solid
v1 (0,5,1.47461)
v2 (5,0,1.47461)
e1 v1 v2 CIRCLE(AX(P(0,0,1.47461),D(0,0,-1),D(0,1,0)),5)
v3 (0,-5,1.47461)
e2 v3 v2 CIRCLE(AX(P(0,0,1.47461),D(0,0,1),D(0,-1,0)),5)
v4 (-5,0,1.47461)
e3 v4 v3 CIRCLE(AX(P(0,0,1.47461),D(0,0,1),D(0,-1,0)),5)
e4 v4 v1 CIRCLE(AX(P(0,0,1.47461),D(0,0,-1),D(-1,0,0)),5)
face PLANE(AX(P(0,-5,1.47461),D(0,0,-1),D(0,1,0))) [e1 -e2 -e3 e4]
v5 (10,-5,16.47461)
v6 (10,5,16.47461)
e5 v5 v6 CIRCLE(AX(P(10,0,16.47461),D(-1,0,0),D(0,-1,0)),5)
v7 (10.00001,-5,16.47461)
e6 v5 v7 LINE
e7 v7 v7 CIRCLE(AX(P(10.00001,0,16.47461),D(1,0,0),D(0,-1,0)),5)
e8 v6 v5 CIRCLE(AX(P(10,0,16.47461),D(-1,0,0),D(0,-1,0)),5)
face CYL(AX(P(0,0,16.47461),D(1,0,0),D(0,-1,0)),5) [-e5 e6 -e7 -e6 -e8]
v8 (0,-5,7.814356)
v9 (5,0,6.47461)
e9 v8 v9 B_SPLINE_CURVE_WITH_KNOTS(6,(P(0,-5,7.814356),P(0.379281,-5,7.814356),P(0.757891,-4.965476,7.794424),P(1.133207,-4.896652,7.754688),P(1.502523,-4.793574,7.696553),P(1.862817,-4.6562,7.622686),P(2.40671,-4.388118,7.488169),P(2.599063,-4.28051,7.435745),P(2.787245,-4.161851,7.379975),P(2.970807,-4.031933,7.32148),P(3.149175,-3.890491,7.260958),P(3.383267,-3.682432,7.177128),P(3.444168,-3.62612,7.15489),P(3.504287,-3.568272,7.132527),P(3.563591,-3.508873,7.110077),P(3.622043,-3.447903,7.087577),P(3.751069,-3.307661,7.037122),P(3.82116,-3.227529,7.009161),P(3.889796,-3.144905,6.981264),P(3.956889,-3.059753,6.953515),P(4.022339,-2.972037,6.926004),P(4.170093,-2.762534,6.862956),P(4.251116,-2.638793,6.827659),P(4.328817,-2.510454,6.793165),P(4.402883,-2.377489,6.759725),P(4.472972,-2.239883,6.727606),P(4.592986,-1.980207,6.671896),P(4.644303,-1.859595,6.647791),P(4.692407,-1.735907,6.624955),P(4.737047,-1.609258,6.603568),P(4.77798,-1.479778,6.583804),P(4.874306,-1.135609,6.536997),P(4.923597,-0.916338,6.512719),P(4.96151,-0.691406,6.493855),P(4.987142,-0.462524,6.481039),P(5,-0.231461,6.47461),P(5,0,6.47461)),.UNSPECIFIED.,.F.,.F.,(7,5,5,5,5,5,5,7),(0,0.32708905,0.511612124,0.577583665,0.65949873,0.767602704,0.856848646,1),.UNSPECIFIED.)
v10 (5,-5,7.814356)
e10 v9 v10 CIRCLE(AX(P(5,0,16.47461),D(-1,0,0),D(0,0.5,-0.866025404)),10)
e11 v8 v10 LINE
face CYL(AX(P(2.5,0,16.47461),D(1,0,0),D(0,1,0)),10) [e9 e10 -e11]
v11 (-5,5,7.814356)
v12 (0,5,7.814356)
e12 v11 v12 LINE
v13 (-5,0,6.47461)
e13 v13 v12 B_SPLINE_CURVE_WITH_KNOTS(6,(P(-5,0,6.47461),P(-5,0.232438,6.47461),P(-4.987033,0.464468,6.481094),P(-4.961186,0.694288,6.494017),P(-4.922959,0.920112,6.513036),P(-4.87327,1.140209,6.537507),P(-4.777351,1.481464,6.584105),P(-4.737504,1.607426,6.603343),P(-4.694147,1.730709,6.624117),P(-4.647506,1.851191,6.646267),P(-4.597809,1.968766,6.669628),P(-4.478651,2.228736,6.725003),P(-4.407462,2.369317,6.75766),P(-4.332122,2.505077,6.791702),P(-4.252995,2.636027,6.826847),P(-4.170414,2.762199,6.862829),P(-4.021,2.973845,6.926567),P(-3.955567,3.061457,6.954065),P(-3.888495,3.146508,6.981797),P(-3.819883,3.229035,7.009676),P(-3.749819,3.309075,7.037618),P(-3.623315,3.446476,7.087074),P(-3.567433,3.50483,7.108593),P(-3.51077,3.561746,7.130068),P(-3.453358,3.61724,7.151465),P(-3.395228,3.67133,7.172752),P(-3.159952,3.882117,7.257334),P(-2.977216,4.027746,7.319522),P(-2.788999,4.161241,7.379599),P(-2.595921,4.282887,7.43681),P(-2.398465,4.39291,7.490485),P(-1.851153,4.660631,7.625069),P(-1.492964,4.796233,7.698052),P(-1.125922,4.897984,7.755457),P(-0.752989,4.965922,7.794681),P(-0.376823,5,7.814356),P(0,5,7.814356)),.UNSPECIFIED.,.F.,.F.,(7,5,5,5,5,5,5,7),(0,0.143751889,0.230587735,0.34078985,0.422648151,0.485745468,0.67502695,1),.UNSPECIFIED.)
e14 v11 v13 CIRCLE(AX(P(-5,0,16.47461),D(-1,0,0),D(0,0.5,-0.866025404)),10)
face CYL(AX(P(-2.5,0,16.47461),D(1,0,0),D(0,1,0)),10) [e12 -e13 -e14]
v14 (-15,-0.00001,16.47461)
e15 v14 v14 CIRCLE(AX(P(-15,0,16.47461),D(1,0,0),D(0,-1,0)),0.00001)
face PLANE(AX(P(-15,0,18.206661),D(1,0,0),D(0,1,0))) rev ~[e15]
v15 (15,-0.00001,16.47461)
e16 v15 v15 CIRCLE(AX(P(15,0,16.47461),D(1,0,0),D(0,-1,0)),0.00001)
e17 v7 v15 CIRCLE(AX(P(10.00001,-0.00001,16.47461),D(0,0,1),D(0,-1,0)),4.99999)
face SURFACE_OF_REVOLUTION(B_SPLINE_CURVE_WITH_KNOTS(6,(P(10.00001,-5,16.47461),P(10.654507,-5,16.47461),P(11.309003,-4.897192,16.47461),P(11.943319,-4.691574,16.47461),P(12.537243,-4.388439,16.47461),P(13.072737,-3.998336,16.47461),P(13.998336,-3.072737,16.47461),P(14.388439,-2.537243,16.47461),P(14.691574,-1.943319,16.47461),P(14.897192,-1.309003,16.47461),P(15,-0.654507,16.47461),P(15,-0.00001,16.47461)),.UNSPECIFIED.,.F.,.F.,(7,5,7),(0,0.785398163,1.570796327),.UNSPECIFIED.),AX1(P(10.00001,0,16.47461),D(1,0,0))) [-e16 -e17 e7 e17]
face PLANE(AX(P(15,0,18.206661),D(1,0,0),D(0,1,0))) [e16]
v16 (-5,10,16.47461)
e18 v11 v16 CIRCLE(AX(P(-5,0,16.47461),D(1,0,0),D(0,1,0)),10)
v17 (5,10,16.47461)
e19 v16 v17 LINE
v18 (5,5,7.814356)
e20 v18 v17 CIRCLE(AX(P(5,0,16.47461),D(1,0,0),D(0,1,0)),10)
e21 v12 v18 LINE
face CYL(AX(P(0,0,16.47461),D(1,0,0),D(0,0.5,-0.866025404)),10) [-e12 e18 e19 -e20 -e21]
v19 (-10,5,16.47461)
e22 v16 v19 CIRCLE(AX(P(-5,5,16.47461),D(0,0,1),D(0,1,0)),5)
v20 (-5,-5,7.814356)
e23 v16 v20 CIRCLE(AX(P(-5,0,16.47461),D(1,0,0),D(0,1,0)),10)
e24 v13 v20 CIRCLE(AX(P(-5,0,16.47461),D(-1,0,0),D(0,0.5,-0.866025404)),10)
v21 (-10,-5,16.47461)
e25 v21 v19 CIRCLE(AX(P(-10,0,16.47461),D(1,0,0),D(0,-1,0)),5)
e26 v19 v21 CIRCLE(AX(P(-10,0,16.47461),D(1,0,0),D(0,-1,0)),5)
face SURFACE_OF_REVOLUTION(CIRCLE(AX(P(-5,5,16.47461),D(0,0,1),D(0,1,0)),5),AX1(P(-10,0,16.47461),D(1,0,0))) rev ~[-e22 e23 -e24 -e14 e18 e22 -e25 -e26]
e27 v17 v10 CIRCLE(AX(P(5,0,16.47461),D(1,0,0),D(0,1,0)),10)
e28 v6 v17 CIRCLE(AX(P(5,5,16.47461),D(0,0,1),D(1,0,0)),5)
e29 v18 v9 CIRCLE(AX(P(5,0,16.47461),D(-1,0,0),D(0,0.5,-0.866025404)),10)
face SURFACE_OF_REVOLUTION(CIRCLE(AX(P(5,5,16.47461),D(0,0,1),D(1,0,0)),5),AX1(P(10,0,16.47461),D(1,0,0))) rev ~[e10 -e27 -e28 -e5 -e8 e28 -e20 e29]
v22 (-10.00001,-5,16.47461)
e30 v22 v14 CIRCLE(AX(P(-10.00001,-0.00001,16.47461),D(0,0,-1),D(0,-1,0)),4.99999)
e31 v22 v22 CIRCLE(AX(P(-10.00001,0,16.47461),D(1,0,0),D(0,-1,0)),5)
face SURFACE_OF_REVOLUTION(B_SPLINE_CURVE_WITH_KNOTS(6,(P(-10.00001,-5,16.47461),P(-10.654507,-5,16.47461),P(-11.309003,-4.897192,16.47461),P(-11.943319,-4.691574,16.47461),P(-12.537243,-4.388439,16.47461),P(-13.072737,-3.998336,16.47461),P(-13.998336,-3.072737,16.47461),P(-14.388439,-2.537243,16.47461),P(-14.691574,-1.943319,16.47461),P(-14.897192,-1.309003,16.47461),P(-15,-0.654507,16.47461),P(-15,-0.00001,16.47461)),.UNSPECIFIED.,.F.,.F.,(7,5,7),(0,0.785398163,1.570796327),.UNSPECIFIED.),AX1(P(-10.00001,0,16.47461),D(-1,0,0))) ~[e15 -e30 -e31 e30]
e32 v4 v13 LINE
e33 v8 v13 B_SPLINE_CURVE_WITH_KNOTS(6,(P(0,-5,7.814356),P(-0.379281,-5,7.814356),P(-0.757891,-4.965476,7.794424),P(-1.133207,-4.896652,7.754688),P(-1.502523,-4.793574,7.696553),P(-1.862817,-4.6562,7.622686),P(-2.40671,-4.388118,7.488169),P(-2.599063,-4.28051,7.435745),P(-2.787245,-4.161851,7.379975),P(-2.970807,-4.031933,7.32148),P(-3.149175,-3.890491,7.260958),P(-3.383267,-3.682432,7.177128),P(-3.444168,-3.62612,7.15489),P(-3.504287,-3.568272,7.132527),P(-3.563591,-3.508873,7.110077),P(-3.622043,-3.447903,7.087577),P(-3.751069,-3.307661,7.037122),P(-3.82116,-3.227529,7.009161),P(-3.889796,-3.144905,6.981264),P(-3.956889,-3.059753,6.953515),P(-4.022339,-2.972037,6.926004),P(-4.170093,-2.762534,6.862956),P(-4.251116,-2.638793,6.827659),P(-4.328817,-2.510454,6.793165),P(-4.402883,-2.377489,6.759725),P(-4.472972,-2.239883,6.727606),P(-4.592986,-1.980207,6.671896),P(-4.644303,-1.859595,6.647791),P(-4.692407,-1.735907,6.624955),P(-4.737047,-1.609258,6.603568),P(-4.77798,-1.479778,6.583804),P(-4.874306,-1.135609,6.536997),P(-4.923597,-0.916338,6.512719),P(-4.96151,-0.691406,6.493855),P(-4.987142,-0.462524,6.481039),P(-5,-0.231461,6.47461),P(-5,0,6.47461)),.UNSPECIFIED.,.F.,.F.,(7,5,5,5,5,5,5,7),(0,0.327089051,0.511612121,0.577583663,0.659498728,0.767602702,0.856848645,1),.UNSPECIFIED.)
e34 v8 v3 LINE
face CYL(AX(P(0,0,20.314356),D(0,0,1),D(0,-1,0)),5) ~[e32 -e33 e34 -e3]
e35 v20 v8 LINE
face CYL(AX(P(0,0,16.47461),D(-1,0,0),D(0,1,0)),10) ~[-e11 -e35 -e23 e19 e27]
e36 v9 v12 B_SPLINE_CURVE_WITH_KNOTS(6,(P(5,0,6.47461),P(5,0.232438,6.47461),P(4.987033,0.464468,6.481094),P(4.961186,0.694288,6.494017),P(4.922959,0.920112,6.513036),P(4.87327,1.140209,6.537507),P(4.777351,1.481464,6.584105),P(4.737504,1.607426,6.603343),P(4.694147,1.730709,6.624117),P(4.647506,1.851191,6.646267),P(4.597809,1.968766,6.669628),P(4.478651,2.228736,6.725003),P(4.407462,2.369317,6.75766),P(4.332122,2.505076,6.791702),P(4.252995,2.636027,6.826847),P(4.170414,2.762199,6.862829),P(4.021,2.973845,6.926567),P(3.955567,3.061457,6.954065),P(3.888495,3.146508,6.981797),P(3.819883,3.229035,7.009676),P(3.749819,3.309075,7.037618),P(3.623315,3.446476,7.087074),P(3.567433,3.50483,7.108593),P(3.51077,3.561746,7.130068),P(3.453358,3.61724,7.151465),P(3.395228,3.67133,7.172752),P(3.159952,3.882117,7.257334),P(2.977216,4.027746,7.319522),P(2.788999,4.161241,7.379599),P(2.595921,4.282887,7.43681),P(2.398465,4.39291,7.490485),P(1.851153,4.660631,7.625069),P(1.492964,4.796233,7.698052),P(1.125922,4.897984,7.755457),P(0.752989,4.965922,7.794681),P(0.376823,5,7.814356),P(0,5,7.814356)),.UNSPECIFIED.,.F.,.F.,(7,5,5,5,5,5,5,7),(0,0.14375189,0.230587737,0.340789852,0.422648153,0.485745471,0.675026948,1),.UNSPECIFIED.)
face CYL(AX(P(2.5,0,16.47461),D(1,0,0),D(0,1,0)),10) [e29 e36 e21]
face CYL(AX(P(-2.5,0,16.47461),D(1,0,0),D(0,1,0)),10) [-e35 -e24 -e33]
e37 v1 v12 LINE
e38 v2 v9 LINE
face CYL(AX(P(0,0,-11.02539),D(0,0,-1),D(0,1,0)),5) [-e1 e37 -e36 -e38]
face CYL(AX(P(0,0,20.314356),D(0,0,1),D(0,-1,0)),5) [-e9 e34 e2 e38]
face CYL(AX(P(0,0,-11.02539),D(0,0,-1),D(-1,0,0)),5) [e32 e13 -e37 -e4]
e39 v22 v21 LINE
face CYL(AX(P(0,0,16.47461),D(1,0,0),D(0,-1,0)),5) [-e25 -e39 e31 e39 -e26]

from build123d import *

# Parameters (mm, degrees)
F1_DEPTH      = 15
F1_DEPTH_BACK = 15
F2_DEPTH      = 10
F2_DEPTH_BACK = 10
F3_DEPTH      = 5
F3_DEPTH_BACK = 5
F4_R          = 4.99999
F5_T8_DEPTH   = 31.3397459622
F5_S9_R       = 10
F5_T10_DEPTH  = 18
F5_T14_DEPTH  = 31.3397459622
F5_S15_R      = 10
F5_T16_DEPTH  = 18
F5_T20_DEPTH  = 31.3397459622
F5_S21_R      = 10
F5_T22_DEPTH  = 18
F5_T26_DEPTH  = 31.3397459622
F5_S27_R      = 10
F5_T28_DEPTH  = 18


# Not quite as in the source:
# - a fillet or chamfer that OpenCascade refuses, or shapes differently, is made with other operations: its cross-section is extruded or revolved along the edge and cut away or added
# - a fillet or chamfer is up to 0.001 mm smaller than in the source, because OpenCascade refuses the exact size


with BuildPart() as f1:
    # F0 (on Right) → F1 (new body, two sides)
    with BuildSketch(Plane.YZ) as f1_sk:
        with BuildLine():
            Line((-5, 16.4746102661), (5, 16.4746102661))
            ThreePointArc((5, 16.4746102661), (0, 21.4746102661), (-5, 16.4746102661))
        make_face()
        with BuildLine():
            ThreePointArc((-5, 16.4746102661), (0, 11.4746102661), (5, 16.4746102661))
            Line((5, 16.4746102661), (-5, 16.4746102661))
        make_face()
    extrude(amount=F1_DEPTH)
    extrude(f1_sk.sketch, amount=-F1_DEPTH_BACK)

    # F0 (on Right) → F2 (join, two sides)
    with BuildSketch(Plane.YZ) as f2_sk:
        with BuildLine():
            ThreePointArc((-5, 16.4746102661), (0, 21.4746102661), (5, 16.4746102661))
            Line((5, 16.4746102661), (5, 7.8143562283))
            ThreePointArc((5, 7.8143562283), (8.6602540378, 11.4746102661), (10, 16.4746102661))
            ThreePointArc((10, 16.4746102661), (-5, 25.1348643039), (-5, 7.8143562283))
            Line((-5, 7.8143562283), (-5, 16.4746102661))
        make_face()
        with BuildLine():
            Line((5, 7.8143562283), (5, 16.4746102661))
            ThreePointArc((5, 16.4746102661), (0, 11.4746102661), (-5, 16.4746102661))
            Line((-5, 16.4746102661), (-5, 7.8143562283))
            ThreePointArc((-5, 7.8143562283), (0, 6.4746102661), (5, 7.8143562283))
        make_face()
    extrude(amount=F2_DEPTH)
    extrude(f2_sk.sketch, amount=-F2_DEPTH_BACK)

    # F0 (on Right) → F3 (join, two sides)
    with BuildSketch(Plane.YZ) as f3_sk:
        with BuildLine():
            Line((5, 1.4746102661), (5, 7.8143562283))
            ThreePointArc((5, 7.8143562283), (0, 6.4746102661), (-5, 7.8143562283))
            Line((-5, 7.8143562283), (-5, 1.4746102661))
            Line((-5, 1.4746102661), (5, 1.4746102661))
        make_face()
    extrude(amount=F3_DEPTH)
    extrude(f3_sk.sketch, amount=-F3_DEPTH_BACK)

    # F4 (radius 5 in the source; OpenCascade refuses exactly that, so slightly less here)
    f4_edges = [f1.edges().sort_by_distance(p)[0] for p in [
        (15, 5, 16.47461),
        (-15, 5, 16.47461),
    ]]
    fillet(f4_edges, radius=F4_R)

    # F5: fillet of radius 5 on 8 edges, made by hand

    # F5_s1 → F5_t2 (revolve, cut)
    with BuildSketch(Plane.XY.offset(16.4746102661)):
        with BuildLine():
            ThreePointArc((-5, 10), (-8.5355339059, 8.5355339059), (-10, 5))
            Line((-10, 5), (-10, 10))
            Line((-10, 10), (-5, 10))
        make_face()
    revolve(axis=Axis((-10, 0, 16.4746102661), (1, 0, 0)), mode=Mode.SUBTRACT)

    # F5_s3 → F5_t4 (revolve, cut)
    with BuildSketch(Plane.XY.offset(16.4746102661)):
        with BuildLine():
            ThreePointArc((10, 5), (8.5355339059, 8.5355339059), (5, 10))
            Line((5, 10), (10, 10))
            Line((10, 10), (10, 5))
        make_face()
    revolve(axis=Axis((10, 0, 16.4746102661), (1, 0, 0)), mode=Mode.SUBTRACT)


with BuildPart() as f5_tool6:
    # F5_s7 → F5_t8 (new body)
    with BuildSketch(Plane.XY.offset(-11.0253897339)):
        with BuildLine():
            ThreePointArc((-5, 0), (-3.5355339059, 3.5355339059), (0, 5))
            Line((0, 5), (-5, 5))
            Line((-5, 5), (-5, 0))
        make_face()
    extrude(amount=F5_T8_DEPTH)

    # F5_s9 → F5_t10 (cut, symmetric)
    with BuildSketch(Plane.YZ.offset(-2.5)):
        with Locations((0, 16.4746102661)):
            Circle(F5_S9_R)
    extrude(amount=F5_T10_DEPTH, both=True, mode=Mode.SUBTRACT)


with BuildPart() as f1_1:
    add(f1.part)

    # F5_t5: cut F5_tool6
    add(f5_tool6.part, mode=Mode.SUBTRACT)


with BuildPart() as f5_tool12:
    # F5_s13 → F5_t14 (new body)
    with BuildSketch(Plane.XY.offset(-11.0253897339)):
        with BuildLine():
            ThreePointArc((0, 5), (3.5355339059, 3.5355339059), (5, 0))
            Line((5, 0), (5, 5))
            Line((5, 5), (0, 5))
        make_face()
    extrude(amount=F5_T14_DEPTH)

    # F5_s15 → F5_t16 (cut, symmetric)
    with BuildSketch(Plane.YZ.offset(2.5)):
        with Locations((0, 16.4746102661)):
            Circle(F5_S15_R)
    extrude(amount=F5_T16_DEPTH, both=True, mode=Mode.SUBTRACT)


with BuildPart() as f1_2:
    add(f1_1.part)

    # F5_t11: cut F5_tool12
    add(f5_tool12.part, mode=Mode.SUBTRACT)


with BuildPart() as f5_tool18:
    # F5_s19 → F5_t20 (new body)
    with BuildSketch(Plane.XY.offset(20.3143562283)):
        with BuildLine():
            ThreePointArc((0, -5), (3.5355339059, -3.5355339059), (5, 0))
            Line((5, 0), (5, -5))
            Line((5, -5), (0, -5))
        make_face()
    extrude(amount=-F5_T20_DEPTH)

    # F5_s21 → F5_t22 (cut, symmetric)
    with BuildSketch(Plane.YZ.offset(2.5)):
        with Locations((0, 16.4746102661)):
            Circle(F5_S21_R)
    extrude(amount=F5_T22_DEPTH, both=True, mode=Mode.SUBTRACT)


with BuildPart() as f1_3:
    add(f1_2.part)

    # F5_t17: cut F5_tool18
    add(f5_tool18.part, mode=Mode.SUBTRACT)


with BuildPart() as f5_tool24:
    # F5_s25 → F5_t26 (new body)
    with BuildSketch(Plane.XY.offset(20.3143562283)):
        with BuildLine():
            ThreePointArc((0, -5), (-3.5355339059, -3.5355339059), (-5, 0))
            Line((-5, 0), (-5, -5))
            Line((-5, -5), (0, -5))
        make_face()
    extrude(amount=-F5_T26_DEPTH)

    # F5_s27 → F5_t28 (cut, symmetric)
    with BuildSketch(Plane.YZ.offset(-2.5)):
        with Locations((0, 16.4746102661)):
            Circle(F5_S27_R)
    extrude(amount=F5_T28_DEPTH, both=True, mode=Mode.SUBTRACT)


with BuildPart() as f1_4:
    add(f1_3.part)

    # F5_t23: cut F5_tool24
    add(f5_tool24.part, mode=Mode.SUBTRACT)


solid = f1_4.part
